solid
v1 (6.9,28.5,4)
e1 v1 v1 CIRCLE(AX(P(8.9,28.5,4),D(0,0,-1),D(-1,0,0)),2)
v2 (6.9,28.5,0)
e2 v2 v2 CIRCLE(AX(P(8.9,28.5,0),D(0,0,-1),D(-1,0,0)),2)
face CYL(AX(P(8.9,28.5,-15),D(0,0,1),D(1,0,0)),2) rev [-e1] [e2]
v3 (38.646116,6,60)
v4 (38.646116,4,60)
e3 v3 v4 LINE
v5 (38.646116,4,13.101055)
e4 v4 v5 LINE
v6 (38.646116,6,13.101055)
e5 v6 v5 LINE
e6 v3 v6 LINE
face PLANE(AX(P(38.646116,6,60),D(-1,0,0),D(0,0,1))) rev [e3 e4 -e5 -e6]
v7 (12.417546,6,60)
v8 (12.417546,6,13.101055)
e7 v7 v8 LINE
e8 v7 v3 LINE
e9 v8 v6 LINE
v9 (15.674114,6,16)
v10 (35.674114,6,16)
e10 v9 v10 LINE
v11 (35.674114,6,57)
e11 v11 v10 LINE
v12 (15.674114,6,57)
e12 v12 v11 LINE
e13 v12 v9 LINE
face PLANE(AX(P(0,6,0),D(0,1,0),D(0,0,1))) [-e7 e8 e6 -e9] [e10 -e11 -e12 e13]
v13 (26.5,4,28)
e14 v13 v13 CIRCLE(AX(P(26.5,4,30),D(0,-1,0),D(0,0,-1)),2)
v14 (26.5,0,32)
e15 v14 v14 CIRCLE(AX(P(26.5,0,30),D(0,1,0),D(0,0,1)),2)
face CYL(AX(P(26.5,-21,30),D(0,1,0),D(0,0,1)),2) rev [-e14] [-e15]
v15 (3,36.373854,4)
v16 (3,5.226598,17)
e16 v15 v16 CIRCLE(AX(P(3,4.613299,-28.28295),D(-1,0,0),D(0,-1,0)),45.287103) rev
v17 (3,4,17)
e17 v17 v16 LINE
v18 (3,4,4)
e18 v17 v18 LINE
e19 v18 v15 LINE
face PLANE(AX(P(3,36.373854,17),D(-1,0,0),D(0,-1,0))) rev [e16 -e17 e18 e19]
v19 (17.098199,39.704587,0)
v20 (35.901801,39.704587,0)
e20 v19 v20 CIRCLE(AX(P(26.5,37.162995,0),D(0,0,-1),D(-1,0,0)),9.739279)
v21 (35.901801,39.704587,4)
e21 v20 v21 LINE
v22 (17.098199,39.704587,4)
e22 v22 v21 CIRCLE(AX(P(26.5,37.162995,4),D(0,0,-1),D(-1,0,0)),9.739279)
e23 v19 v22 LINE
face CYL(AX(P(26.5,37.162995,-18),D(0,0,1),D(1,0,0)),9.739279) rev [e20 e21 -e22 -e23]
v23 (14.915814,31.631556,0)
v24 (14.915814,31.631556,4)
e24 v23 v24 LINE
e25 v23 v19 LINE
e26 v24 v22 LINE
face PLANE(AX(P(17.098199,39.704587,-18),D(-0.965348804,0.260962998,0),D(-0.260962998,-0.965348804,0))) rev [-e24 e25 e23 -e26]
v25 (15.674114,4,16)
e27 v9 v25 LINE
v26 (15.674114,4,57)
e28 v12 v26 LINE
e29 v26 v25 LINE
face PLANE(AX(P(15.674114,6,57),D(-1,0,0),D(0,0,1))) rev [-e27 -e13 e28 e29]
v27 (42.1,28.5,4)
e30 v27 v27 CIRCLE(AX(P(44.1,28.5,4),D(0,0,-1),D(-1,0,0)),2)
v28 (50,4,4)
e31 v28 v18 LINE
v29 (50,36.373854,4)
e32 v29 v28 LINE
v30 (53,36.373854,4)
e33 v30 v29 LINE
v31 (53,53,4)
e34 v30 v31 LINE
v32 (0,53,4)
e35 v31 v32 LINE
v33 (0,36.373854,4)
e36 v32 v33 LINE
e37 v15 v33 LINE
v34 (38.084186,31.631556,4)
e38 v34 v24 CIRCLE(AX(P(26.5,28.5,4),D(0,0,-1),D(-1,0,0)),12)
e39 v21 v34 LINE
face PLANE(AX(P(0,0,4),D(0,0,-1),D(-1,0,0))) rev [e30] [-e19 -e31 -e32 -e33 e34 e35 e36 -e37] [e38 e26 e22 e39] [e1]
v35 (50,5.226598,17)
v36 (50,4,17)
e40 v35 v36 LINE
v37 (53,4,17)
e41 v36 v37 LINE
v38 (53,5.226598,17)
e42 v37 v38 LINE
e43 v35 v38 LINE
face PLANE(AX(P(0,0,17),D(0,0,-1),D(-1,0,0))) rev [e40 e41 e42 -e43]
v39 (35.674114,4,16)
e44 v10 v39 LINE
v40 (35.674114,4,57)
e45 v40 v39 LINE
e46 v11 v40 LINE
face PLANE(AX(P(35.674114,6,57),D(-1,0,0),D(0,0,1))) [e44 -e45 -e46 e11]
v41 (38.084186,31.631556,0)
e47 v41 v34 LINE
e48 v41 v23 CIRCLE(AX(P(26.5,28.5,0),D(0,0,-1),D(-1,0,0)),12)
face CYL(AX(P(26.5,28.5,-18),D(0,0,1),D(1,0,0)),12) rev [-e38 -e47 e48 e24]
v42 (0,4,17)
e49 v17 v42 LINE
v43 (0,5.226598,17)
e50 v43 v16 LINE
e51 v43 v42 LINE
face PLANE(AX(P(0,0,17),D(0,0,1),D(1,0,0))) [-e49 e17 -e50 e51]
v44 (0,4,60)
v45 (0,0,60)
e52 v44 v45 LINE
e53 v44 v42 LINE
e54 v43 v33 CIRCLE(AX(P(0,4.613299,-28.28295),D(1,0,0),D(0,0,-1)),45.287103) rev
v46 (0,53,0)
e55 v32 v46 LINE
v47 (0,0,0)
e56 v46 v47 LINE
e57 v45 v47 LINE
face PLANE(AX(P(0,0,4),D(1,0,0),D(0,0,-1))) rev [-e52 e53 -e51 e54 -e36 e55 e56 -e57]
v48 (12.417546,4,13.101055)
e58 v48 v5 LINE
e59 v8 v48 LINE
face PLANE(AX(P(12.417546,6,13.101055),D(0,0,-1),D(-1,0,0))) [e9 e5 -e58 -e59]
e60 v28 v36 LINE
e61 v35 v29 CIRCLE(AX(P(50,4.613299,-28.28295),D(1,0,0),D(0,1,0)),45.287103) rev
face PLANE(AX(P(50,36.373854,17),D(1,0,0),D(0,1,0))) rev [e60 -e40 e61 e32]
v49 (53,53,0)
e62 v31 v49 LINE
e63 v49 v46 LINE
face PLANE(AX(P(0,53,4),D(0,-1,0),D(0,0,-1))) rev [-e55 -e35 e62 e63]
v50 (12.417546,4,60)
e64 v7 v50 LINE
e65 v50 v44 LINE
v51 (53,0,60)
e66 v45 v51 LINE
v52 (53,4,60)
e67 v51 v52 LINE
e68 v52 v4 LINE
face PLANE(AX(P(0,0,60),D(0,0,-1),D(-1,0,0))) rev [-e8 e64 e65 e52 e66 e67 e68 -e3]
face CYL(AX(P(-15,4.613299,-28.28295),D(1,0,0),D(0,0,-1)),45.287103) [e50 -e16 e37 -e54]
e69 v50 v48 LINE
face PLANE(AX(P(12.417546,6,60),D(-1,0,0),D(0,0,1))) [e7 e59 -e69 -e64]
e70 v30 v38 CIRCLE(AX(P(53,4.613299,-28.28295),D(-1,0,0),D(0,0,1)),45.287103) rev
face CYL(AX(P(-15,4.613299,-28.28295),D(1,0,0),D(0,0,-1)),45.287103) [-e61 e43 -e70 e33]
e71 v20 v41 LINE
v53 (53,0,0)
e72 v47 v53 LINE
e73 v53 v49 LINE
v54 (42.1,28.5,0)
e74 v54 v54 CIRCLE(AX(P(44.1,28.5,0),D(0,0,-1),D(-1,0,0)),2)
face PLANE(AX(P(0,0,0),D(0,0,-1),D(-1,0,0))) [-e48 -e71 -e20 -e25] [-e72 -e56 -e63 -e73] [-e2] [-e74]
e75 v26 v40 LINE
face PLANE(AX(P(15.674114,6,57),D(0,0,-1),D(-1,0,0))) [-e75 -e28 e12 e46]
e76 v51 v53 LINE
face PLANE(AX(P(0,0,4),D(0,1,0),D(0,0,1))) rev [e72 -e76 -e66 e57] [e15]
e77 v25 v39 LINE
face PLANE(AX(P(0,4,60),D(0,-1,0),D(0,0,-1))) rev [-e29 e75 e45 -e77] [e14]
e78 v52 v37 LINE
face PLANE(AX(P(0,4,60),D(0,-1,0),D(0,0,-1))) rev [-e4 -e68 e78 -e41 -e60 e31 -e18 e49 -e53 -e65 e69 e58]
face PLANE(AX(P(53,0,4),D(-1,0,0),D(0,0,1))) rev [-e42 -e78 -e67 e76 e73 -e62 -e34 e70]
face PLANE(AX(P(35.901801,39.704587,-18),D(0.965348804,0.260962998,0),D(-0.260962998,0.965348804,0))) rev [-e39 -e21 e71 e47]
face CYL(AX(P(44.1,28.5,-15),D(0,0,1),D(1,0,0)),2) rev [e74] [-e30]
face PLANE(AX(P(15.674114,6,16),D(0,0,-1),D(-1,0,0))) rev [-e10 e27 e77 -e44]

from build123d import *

# Parameters (mm, degrees)
ESBO_O1_W                  = 53
ESBO_O1_H                  = 53
RESSALTO_EXTRUS_O1_DEPTH   = 4
ESBO_O2_W                  = 53
ESBO_O2_H                  = 4
RESSALTO_EXTRUS_O2_DEPTH   = 60
CORTE_EXTRUS_O1_DEPTH      = 21
CORTE_EXTRUS_O1_DEPTH_BACK = 18
CORTE_EXTRUS_O2_DEPTH      = 17
CORTE_EXTRUS_O2_DEPTH_BACK = 15
ESBO_O4_R                  = 2
ESBO_O5_W                  = 3
ESBO_O5_H                  = 36.373853852
RESSALTO_EXTRUS_O3_DEPTH   = 17
CORTE_EXTRUS_O3_DEPTH      = 62
CORTE_EXTRUS_O3_DEPTH_BACK = 15
ESBO_O7_W                  = 26.228570329
ESBO_O7_H                  = 46.898944641
ESBO_O7_W_2                = 20
ESBO_O7_H_2                = 41
RESSALTO_EXTRUS_O4_DEPTH   = 6
CORTE_EXTRUS_O4_DEPTH      = 10
CORTE_EXTRUS_O4_DEPTH_BACK = 21
ESBO_O8_R                  = 2


with BuildPart() as part:
    # Esboço1 → Ressalto-extrusão1 (new body)
    with BuildSketch(Plane.XY):
        with Locations((26.5, 26.5)):
            Rectangle(ESBO_O1_W, ESBO_O1_H)
    extrude(amount=RESSALTO_EXTRUS_O1_DEPTH)

    # Esboço2 → Ressalto-extrusão2 (add)
    with BuildSketch(Plane.XY):
        with Locations((26.5, 2)):
            Rectangle(ESBO_O2_W, ESBO_O2_H)
    extrude(amount=RESSALTO_EXTRUS_O2_DEPTH)

    # Esboço3 → Corte-extrusão1 (cut, two sides: drawn at the far end of the back side and taken through both)
    with BuildSketch(Plane.XY.offset(-CORTE_EXTRUS_O1_DEPTH_BACK)):
        with BuildLine():
            Line((17.098198891, 39.704586726), (14.91581435, 31.631555975))
            ThreePointArc((14.91581435, 31.631555975), (26.5, 16.5), (38.08418565, 31.631555975))
            Line((38.08418565, 31.631555975), (35.901801109, 39.704586726))
            ThreePointArc((35.901801109, 39.704586726), (26.5, 46.902274107), (17.098198891, 39.704586726))
        make_face()
    extrude(amount=CORTE_EXTRUS_O1_DEPTH + CORTE_EXTRUS_O1_DEPTH_BACK, mode=Mode.SUBTRACT)

    # Esboço4 → Corte-extrusão2 (cut, two sides: drawn at the far end of the back side and taken through both)
    with BuildSketch(Plane.XY.offset(-CORTE_EXTRUS_O2_DEPTH_BACK)):
        with Locations((8.9, 28.5)):
            Circle(ESBO_O4_R)
        with Locations((44.1, 28.5)):
            Circle(ESBO_O4_R)
    extrude(amount=CORTE_EXTRUS_O2_DEPTH + CORTE_EXTRUS_O2_DEPTH_BACK, mode=Mode.SUBTRACT)

    # Esboço5 → Ressalto-extrusão3 (add)
    with BuildSketch(Plane.XY):
        with Locations((1.5, 18.186926926)):
            Rectangle(ESBO_O5_W, ESBO_O5_H)
        with Locations((51.5, 18.186926926)):
            Rectangle(ESBO_O5_W, ESBO_O5_H)
    extrude(amount=RESSALTO_EXTRUS_O3_DEPTH)

    # Esboço6 → Corte-extrusão3 (cut, two sides: drawn at the far end of the back side and taken through both)
    with BuildSketch(Plane(origin=(0, 0, 0), x_dir=(0, 0, -1), z_dir=(1, 0, 0)).offset(-CORTE_EXTRUS_O3_DEPTH_BACK)):
        with BuildLine():
            ThreePointArc((-17, 5.226597996), (-13.510052949, 22.056538471), (-4, 36.373853852))
            Line((-4, 36.373853852), (-17, 36.373853852))
            Line((-17, 36.373853852), (-17, 5.226597996))
        make_face()
    extrude(amount=CORTE_EXTRUS_O3_DEPTH + CORTE_EXTRUS_O3_DEPTH_BACK, mode=Mode.SUBTRACT)

    # Esboço7 → Ressalto-extrusão4 (add)
    with BuildSketch(Plane(origin=(0, 0, 0), x_dir=(1, 0, 0), z_dir=(0, 1, 0))):
        with Locations((25.531831297, -36.55052768)):
            Rectangle(ESBO_O7_W, ESBO_O7_H)
        with Locations((25.674113589, -36.5)):
            Rectangle(ESBO_O7_W_2, ESBO_O7_H_2, mode=Mode.SUBTRACT)
    extrude(amount=RESSALTO_EXTRUS_O4_DEPTH)

    # Esboço8 → Corte-extrusão4 (cut, two sides: drawn at the far end of the back side and taken through both)
    with BuildSketch(Plane(origin=(0, 0, 0), x_dir=(1, 0, 0), z_dir=(0, 1, 0)).offset(-CORTE_EXTRUS_O4_DEPTH_BACK)):
        with Locations((26.5, -30)):
            Circle(ESBO_O8_R)
    extrude(amount=CORTE_EXTRUS_O4_DEPTH + CORTE_EXTRUS_O4_DEPTH_BACK, mode=Mode.SUBTRACT)


solid = part.part
